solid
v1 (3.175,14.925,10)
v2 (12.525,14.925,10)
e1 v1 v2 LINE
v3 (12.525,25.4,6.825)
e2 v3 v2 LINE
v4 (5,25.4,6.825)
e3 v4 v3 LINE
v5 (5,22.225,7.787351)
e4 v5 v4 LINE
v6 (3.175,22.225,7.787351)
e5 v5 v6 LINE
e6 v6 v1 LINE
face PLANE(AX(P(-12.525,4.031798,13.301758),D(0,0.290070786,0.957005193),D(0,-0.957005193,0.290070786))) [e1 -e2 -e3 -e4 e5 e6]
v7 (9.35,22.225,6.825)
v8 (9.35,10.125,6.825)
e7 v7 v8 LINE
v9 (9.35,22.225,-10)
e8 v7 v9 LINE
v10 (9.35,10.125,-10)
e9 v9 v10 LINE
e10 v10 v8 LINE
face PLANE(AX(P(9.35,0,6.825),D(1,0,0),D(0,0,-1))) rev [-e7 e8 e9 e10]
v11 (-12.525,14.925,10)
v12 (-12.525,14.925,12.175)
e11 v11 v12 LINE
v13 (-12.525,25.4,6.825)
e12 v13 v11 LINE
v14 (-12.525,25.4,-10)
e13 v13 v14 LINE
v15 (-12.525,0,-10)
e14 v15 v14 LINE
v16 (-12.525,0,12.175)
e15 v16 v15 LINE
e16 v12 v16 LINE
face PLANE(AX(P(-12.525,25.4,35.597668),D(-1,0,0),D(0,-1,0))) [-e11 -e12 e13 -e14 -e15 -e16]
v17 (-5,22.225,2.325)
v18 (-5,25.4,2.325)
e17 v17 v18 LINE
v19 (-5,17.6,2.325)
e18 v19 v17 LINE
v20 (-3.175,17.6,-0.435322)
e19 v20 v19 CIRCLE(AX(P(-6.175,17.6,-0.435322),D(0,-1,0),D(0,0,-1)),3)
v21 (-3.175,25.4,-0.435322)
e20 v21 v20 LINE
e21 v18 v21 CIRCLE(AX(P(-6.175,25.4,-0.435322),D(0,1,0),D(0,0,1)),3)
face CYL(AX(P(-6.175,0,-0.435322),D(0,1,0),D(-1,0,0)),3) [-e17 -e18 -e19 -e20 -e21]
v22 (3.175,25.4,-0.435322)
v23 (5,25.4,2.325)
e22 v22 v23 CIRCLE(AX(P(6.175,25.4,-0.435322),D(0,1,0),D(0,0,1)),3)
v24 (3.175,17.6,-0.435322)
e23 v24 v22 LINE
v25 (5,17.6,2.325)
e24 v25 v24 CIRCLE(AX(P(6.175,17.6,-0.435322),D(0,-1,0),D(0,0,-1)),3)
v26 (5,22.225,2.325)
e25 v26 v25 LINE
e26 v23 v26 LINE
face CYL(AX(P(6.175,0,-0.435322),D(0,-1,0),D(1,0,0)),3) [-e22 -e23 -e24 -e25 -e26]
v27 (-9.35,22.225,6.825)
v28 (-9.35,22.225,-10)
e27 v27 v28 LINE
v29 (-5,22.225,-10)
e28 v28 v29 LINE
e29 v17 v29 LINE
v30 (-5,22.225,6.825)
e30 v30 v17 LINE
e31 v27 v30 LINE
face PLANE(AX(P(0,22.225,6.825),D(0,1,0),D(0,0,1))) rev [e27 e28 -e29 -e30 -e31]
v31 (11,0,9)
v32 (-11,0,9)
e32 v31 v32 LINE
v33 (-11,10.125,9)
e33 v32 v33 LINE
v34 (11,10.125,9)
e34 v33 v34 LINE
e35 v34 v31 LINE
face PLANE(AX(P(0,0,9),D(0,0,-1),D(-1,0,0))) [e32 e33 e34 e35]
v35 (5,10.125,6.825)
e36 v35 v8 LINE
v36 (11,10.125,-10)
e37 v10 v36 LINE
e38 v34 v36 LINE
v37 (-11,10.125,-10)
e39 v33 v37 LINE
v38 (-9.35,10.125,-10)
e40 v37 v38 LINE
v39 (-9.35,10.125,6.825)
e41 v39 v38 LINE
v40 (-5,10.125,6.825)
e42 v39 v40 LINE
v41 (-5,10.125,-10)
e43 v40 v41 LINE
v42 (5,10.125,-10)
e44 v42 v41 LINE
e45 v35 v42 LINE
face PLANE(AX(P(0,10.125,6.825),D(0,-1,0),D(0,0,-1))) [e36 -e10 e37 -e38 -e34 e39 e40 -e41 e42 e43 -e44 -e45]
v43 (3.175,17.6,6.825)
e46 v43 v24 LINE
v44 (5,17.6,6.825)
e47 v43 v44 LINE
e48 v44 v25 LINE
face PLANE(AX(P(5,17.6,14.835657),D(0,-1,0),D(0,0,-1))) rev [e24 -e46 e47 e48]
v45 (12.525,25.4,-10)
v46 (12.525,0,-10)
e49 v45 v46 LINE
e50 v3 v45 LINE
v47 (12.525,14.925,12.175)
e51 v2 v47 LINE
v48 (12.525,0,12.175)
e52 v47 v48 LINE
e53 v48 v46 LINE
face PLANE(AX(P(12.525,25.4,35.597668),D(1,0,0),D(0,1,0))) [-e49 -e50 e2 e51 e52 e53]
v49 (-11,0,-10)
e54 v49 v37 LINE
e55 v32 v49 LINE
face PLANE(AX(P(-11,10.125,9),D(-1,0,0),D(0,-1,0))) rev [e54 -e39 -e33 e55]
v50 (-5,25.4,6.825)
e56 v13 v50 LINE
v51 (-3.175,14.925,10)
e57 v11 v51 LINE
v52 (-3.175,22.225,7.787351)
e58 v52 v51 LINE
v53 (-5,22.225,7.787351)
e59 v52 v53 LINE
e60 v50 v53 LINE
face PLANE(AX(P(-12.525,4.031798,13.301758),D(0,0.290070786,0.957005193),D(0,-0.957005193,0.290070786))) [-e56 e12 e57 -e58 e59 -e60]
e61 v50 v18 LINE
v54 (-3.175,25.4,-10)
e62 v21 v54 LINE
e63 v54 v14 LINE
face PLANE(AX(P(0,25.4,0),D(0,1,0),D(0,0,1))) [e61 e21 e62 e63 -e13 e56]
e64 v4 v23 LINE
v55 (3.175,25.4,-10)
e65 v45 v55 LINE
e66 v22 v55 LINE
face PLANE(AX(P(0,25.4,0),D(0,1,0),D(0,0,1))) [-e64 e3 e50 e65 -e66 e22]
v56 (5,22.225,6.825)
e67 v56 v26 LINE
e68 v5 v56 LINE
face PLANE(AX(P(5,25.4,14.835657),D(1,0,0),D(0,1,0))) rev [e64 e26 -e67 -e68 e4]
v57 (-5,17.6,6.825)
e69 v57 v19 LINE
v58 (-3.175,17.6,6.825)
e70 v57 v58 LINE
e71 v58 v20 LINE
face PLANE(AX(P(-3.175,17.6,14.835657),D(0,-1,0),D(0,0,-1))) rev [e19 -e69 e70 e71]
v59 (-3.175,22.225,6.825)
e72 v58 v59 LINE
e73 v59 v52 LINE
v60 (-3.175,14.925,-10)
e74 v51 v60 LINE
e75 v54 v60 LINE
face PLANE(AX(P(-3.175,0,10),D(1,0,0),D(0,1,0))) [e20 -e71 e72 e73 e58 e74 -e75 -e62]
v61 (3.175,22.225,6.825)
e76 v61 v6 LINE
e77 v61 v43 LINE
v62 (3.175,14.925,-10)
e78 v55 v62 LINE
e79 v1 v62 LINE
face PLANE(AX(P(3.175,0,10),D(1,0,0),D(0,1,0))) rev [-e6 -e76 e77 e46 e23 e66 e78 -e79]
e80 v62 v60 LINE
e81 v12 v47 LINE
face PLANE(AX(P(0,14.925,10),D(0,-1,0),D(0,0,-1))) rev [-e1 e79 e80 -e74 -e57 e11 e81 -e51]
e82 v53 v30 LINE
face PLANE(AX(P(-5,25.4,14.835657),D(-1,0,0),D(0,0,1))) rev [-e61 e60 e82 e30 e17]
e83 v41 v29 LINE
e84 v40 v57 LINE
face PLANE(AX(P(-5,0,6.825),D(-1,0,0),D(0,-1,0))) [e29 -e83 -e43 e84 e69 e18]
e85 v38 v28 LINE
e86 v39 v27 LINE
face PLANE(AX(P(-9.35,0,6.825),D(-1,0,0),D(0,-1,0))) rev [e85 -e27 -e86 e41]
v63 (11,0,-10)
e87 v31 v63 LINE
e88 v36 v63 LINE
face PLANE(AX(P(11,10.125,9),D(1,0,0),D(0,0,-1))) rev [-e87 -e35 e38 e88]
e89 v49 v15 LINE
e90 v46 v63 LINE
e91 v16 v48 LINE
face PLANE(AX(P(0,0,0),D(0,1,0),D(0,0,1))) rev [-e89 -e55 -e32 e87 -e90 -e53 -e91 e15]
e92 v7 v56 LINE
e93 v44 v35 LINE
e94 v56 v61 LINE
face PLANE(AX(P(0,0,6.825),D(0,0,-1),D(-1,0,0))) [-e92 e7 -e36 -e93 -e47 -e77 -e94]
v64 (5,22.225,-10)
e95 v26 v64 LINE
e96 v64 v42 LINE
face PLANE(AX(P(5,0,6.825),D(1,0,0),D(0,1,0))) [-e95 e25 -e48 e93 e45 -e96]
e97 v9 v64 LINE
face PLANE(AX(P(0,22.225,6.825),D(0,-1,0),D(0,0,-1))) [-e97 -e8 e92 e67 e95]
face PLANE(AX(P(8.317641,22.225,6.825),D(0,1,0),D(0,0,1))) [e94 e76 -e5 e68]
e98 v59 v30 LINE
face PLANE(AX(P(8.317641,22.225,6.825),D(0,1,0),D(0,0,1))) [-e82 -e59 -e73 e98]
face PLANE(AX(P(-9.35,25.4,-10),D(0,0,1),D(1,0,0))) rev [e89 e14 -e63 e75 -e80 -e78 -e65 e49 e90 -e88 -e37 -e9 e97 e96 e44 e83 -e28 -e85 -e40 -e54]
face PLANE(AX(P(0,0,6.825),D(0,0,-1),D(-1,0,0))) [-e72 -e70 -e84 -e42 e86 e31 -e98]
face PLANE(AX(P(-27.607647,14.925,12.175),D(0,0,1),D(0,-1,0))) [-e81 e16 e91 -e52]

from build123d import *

# Parameters (mm, degrees)
SKETCH2_W           = 18.7
SKETCH2_H           = 20
BOSS_EXTRUDE1_DEPTH = 25.4
SKETCH3_W           = 6.35
SKETCH3_H           = 3.175
SKETCH3_H_2         = 4.125
CUT_EXTRUDE1_DEPTH  = 34.653863077
SKETCH5_W           = 3.175
SKETCH5_H           = 25.4
BOSS_EXTRUDE2_DEPTH = 20
SKETCH6_W           = 10
SKETCH6_H           = 10.125
CUT_EXTRUDE2_DEPTH  = 16.825
CUT_EXTRUDE3_REACH  = 34.439
SKETCH7_W           = 3
SKETCH7_H           = 3.5
SKETCH8_W           = 22
SKETCH8_H           = 10.125
CUT_EXTRUDE4_DEPTH  = 19
SKETCH9_W           = 2.175
SKETCH9_H           = 14.925
BOSS_EXTRUDE3_DEPTH = 25.05
SKETCH10_W          = 1.825
SKETCH10_H          = 7.8
CUT_EXTRUDE5_DEPTH  = 4.5
CUT_EXTRUDE6_DEPTH  = 38.694736038
SKETCH15_W          = 0.962350835
SKETCH15_H          = 3.175
CUT_EXTRUDE8_DEPTH  = 10
FILLET1_R           = 3


with BuildPart() as part:
    # Sketch2 → Boss-Extrude1 (new body)
    with BuildSketch(Plane(origin=(0, 0, 0), x_dir=(1, 0, 0), z_dir=(0, 1, 0))):
        Rectangle(SKETCH2_W, SKETCH2_H)
    extrude(amount=BOSS_EXTRUDE1_DEPTH)

    # Sketch3 → Cut-Extrude1 (cut, through all)
    with BuildSketch(Plane(origin=(0, 0, -10), x_dir=(-1, 0, 0), z_dir=(0, 0, -1))):
        with Locations((0, 16.5125)):
            Rectangle(SKETCH3_W, SKETCH3_H)
        with Locations((0, 20.1625)):
            Rectangle(SKETCH3_W, SKETCH3_H_2)
        with Locations((0, 23.8125)):
            Rectangle(SKETCH3_W, SKETCH3_H)
    extrude(amount=-CUT_EXTRUDE1_DEPTH, mode=Mode.SUBTRACT)

    # Sketch5 → Boss-Extrude2 (add)
    with BuildSketch(Plane(origin=(0, 0, -10), x_dir=(-1, 0, 0), z_dir=(0, 0, -1))):
        with Locations((-10.9375, 12.7)):
            Rectangle(SKETCH5_W, SKETCH5_H)
        with Locations((10.9375, 12.7)):
            Rectangle(SKETCH5_W, SKETCH5_H)
    extrude(amount=-BOSS_EXTRUDE2_DEPTH)

    # Sketch6 → Cut-Extrude2 (cut)
    with BuildSketch(Plane(origin=(0, 0, -10), x_dir=(-1, 0, 0), z_dir=(0, 0, -1))):
        Polygon((5, 22.225), (5, 10.125), (5, 0), (9.35, 0), (9.35, 22.225), align=None)
        with Locations((0, 5.0625)):
            Rectangle(SKETCH6_W, SKETCH6_H)
        Polygon((-5, 22.225), (-9.35, 22.225), (-9.35, 0), (-5, 0), (-5, 10.125), align=None)
    extrude(amount=-CUT_EXTRUDE2_DEPTH, mode=Mode.SUBTRACT)

    # Cut-Extrude3: up to this face of the body (flat: up to its plane)
    cut_extrude3_end = Plane(part.part.faces().sort_by_distance((-5, 16.175, -1.5875))[0])
    # Sketch7 → Cut-Extrude3 (cut, up to the picked face)
    with BuildSketch(Plane(origin=(5, 0, 0), x_dir=(0, 0, -1), z_dir=(1, 0, 0)), mode=Mode.PRIVATE) as cut_extrude3_sk1:
        with Locations((-4.825, 19.725)):
            Rectangle(SKETCH7_W, SKETCH7_H)
    cut_extrude3_tool1 = split(extrude(cut_extrude3_sk1.sketch, amount=-CUT_EXTRUDE3_REACH, mode=Mode.PRIVATE), bisect_by=cut_extrude3_end, keep=Keep.BOTH, mode=Mode.PRIVATE)
    add(cut_extrude3_tool1.solids().sort_by(Axis((5, 19.725, 4.825), (-1, 0, 0)))[0], mode=Mode.SUBTRACT)

    # Sketch8 → Cut-Extrude4 (cut)
    with BuildSketch(Plane(origin=(0, 0, -10), x_dir=(-1, 0, 0), z_dir=(0, 0, -1))):
        with Locations((0, 5.0625)):
            Rectangle(SKETCH8_W, SKETCH8_H)
    extrude(amount=-CUT_EXTRUDE4_DEPTH, mode=Mode.SUBTRACT)

    # Sketch9 → Boss-Extrude3 (add)
    with BuildSketch(Plane(origin=(12.525, 0, 0), x_dir=(0, 0, -1), z_dir=(1, 0, 0))):
        with Locations((-11.0875, 7.4625)):
            Rectangle(SKETCH9_W, SKETCH9_H)
    extrude(amount=-BOSS_EXTRUDE3_DEPTH)

    # Sketch10 → Cut-Extrude5 (cut)
    with BuildSketch(Plane(origin=(0, 0, 2.325), x_dir=(-1, 0, 0), z_dir=(0, 0, -1))):
        with Locations((-4.0875, 21.5)):
            Rectangle(SKETCH10_W, SKETCH10_H)
        with Locations((4.0875, 21.5)):
            Rectangle(SKETCH10_W, SKETCH10_H)
    extrude(amount=-CUT_EXTRUDE5_DEPTH, mode=Mode.SUBTRACT)

    # Sketch11 → Cut-Extrude6 (cut, through all)
    with BuildSketch(Plane(origin=(12.525, 0, 0), x_dir=(0, 0, -1), z_dir=(1, 0, 0))):
        Polygon((-10, 14.925), (-6.825, 25.4), (-10, 25.4), align=None)
    extrude(amount=-CUT_EXTRUDE6_DEPTH, mode=Mode.SUBTRACT)

    # Sketch15 → Cut-Extrude8 (cut)
    with BuildSketch(Plane(origin=(-5, 0, 0), x_dir=(0, 0, -1), z_dir=(1, 0, 0))):
        with Locations((-7.306175418, 23.8125)):
            Rectangle(SKETCH15_W, SKETCH15_H)
    extrude(amount=CUT_EXTRUDE8_DEPTH, mode=Mode.SUBTRACT)

    # Fillet1
    # the kernel refuses this fillet: 3 mm, written as the material it takes off along each edge
    with BuildSketch(Plane(origin=(3.175, 32.300803848, 2.325), x_dir=(0, 0, -1), z_dir=(0, -1, 0)), Plane(origin=(-3.175, 17.6, 2.325), x_dir=(0, 0, -1), z_dir=(0, 1, 0))) as fillet1_piece_1:
        with BuildLine():
            CenterArc((2.760321539, 3), FILLET1_R, 203.058244088, 66.941755912)
            Line((0, 1.825), (-0.055206431, 1.8015))
            ThreePointArc((-0.055206431, 1.8015), (-0.06, 0.9125), (-0.06, 0))
            Line((-0.06, 0), (0, -0.06))
            Line((0, -0.06), (2.760321539, -0.06))
            Line((2.760321539, -0.06), (2.760321539, 0))
        make_face()
    extrude(amount=14.700803848, mode=Mode.SUBTRACT)


solid = part.part
